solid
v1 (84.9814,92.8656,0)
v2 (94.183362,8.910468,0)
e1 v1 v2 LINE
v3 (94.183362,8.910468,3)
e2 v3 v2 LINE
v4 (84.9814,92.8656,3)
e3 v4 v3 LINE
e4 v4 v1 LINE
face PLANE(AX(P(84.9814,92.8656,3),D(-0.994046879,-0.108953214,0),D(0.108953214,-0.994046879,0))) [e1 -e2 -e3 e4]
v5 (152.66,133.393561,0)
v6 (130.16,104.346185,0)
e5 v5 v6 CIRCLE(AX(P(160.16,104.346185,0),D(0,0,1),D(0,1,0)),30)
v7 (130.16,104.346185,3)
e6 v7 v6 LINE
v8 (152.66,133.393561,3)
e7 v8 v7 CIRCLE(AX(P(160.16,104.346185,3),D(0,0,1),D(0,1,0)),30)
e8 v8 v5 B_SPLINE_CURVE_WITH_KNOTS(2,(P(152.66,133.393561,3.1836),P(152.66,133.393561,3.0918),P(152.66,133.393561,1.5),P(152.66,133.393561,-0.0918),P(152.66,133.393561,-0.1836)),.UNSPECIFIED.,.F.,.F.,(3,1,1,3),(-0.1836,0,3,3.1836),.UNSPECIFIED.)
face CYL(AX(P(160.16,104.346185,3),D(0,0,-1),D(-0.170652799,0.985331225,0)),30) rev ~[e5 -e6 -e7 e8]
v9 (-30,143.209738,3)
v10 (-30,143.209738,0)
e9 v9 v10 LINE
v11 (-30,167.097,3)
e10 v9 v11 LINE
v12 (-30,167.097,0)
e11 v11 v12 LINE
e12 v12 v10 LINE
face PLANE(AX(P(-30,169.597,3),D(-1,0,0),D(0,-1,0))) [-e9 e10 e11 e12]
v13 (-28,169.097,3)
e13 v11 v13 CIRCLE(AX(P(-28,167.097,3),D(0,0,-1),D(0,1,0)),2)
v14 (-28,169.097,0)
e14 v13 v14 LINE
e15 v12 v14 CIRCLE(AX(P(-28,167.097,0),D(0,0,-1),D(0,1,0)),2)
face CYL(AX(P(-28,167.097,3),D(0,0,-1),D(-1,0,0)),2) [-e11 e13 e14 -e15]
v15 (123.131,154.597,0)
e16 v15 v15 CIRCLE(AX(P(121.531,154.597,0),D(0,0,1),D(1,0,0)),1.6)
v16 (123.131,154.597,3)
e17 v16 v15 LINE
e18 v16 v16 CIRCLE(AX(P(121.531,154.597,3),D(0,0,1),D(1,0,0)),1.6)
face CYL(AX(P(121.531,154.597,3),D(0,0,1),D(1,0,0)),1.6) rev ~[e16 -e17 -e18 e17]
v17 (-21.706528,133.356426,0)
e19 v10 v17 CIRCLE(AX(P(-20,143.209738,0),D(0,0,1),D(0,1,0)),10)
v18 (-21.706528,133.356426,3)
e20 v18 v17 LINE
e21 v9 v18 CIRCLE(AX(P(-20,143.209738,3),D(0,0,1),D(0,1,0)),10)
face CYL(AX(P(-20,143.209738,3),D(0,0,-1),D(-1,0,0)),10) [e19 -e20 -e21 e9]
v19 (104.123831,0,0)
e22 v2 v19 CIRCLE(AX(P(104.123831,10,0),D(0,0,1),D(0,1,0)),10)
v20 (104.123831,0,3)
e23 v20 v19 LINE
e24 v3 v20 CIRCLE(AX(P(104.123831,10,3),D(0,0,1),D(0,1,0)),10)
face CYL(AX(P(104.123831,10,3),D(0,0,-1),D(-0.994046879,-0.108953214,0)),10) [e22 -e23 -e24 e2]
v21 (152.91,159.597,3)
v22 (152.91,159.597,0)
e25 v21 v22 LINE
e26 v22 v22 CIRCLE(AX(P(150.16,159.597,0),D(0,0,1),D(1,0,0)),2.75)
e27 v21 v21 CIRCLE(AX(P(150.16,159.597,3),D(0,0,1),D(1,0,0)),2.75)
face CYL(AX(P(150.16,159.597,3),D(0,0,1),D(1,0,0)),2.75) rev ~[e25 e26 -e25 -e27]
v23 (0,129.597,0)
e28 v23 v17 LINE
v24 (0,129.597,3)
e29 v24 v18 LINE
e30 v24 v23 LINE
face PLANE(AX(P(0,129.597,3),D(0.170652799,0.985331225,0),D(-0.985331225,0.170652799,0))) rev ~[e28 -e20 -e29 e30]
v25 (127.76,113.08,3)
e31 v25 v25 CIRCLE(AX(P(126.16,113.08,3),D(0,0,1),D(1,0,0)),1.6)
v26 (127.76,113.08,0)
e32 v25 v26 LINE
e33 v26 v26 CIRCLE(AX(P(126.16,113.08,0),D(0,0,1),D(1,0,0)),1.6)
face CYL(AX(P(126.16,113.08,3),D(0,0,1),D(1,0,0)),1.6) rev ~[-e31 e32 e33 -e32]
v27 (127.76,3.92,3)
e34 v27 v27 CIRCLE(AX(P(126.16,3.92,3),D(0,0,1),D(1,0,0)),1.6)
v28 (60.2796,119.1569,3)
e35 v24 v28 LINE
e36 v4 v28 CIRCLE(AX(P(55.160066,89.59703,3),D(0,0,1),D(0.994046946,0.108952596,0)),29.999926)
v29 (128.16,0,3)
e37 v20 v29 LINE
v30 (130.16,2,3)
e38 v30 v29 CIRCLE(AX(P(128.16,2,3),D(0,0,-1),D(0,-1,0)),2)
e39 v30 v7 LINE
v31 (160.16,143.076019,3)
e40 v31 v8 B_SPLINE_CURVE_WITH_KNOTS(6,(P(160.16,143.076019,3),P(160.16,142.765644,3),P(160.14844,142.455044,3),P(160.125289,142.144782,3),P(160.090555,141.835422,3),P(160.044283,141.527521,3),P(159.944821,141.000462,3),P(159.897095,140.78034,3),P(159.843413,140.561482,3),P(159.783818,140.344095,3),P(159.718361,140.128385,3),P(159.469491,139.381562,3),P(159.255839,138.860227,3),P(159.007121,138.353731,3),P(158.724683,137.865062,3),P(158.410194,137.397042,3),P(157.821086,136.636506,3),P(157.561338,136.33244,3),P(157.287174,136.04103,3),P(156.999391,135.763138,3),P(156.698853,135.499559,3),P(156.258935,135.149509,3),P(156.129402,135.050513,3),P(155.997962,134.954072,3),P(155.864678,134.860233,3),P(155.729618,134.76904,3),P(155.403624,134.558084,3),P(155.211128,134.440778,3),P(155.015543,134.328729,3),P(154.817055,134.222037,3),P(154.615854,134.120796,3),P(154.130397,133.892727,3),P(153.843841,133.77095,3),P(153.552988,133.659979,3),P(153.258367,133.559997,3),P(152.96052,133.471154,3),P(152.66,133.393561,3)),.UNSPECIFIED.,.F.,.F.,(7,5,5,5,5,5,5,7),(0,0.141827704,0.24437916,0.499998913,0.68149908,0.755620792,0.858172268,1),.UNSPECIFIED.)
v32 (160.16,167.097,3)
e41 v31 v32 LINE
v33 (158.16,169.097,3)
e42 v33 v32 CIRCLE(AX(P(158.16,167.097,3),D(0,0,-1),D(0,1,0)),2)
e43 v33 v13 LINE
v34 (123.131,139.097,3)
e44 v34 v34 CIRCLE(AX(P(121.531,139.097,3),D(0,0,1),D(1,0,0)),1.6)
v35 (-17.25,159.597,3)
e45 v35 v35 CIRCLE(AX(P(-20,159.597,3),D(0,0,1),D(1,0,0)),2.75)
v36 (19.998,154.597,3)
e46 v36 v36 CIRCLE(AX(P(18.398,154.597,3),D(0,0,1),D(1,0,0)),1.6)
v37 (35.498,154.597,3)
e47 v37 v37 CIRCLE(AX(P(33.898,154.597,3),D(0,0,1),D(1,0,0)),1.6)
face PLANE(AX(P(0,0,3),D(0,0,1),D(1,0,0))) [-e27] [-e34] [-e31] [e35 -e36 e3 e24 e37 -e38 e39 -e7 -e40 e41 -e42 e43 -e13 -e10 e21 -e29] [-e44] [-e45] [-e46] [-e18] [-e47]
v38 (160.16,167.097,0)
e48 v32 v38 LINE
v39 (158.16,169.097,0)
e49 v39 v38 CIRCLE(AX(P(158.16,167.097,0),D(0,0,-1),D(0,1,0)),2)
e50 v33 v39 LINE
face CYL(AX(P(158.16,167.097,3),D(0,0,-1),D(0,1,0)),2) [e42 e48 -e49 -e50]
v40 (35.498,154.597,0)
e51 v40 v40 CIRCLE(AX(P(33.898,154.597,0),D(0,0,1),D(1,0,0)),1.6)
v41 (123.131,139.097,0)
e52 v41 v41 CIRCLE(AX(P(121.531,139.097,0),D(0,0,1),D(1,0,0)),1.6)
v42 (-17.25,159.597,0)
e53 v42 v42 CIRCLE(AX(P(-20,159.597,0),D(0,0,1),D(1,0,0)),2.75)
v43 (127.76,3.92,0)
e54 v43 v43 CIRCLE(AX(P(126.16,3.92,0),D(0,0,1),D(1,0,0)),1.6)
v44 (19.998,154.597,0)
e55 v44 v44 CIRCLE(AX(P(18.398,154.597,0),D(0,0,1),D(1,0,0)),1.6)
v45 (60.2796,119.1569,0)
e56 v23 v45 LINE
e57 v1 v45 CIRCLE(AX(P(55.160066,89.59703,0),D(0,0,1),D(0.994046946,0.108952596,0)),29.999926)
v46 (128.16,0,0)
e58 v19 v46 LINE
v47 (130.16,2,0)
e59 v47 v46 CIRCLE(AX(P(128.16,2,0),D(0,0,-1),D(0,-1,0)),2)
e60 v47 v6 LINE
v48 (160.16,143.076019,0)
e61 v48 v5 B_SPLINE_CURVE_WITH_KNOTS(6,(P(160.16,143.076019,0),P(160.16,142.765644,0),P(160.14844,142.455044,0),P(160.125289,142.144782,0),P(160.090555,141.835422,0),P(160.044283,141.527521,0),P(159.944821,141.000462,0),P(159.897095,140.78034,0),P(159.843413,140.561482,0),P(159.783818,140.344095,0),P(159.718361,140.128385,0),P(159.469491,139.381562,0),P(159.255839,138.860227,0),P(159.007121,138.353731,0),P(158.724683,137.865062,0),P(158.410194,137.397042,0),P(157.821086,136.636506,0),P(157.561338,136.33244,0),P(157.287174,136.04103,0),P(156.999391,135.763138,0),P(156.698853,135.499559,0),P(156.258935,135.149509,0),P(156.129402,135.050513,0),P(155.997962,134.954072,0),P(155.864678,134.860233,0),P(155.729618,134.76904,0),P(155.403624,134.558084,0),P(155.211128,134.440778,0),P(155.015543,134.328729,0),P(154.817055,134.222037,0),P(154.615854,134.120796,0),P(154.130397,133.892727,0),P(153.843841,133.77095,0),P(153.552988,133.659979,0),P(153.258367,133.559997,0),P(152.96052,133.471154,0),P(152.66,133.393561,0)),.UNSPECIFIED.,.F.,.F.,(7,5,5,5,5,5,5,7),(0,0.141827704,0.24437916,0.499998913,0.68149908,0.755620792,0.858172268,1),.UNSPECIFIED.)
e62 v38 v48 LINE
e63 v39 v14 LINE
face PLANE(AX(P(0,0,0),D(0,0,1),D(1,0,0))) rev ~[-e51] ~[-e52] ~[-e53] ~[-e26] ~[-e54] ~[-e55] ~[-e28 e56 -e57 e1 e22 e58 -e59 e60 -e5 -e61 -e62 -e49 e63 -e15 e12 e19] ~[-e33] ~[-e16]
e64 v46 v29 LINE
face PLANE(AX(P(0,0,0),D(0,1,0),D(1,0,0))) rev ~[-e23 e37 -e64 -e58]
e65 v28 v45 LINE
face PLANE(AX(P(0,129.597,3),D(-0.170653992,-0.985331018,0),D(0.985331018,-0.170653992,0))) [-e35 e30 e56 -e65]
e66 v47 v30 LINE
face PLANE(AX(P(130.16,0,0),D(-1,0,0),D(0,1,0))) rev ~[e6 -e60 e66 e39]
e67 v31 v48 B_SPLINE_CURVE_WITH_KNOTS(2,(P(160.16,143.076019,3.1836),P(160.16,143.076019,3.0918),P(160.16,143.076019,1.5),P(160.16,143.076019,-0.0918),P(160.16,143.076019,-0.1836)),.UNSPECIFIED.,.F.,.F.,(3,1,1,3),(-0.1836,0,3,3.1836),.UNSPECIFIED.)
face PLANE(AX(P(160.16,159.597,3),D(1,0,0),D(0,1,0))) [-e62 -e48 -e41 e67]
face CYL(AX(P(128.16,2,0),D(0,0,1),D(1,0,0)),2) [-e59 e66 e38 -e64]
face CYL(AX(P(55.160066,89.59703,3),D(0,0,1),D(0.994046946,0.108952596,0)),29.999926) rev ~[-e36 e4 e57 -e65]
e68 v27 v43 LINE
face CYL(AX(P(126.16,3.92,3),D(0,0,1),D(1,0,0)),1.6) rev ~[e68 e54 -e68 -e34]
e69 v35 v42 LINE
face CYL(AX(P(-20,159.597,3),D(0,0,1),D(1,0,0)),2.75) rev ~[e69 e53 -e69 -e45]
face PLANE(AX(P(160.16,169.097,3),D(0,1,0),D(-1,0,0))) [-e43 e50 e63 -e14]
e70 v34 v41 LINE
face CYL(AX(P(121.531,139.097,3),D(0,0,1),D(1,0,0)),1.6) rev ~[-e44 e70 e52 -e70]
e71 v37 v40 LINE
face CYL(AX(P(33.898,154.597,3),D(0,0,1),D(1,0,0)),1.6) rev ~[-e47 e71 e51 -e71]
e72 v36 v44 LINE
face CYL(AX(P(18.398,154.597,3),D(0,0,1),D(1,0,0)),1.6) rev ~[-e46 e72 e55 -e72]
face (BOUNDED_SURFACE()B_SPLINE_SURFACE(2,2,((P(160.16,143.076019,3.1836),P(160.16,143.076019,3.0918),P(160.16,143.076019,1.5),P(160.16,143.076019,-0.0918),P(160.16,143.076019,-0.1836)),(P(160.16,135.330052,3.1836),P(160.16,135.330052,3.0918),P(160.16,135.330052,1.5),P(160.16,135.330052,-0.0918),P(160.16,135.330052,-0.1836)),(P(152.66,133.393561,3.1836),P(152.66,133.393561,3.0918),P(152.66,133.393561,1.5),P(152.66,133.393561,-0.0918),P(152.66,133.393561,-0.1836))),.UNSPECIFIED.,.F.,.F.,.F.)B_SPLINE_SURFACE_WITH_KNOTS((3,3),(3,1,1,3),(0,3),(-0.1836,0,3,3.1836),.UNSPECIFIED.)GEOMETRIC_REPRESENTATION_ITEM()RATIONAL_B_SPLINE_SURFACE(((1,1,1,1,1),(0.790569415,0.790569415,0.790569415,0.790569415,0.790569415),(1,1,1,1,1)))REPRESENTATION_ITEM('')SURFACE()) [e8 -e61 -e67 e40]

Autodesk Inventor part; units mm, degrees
ref_plane "YZ Plane" through (0, 0, 0) normal (1, 0, 0) x (0, 1, 0)
ref_plane "XZ Plane" through (0, 0, 0) normal (0, 1, 0) x (-1, 0, 0)
ref_plane "XY Plane" through (0, 0, 0) normal (0, 0, 1) x (1, 0, 0)
sketch "スケッチ1" plane through (0, 0, 0) normal (0, 0, 1) x (1, 0, 0)
  line L0 (0, 0) -> (130.16, 0)
  line L1 (130.16, 0) -> (130.16, 159.597)
  line L2 (130.16, 159.597) -> (0, 159.597)
  line L3 (0, 159.597) -> (0, 0)
  dimension "d0" = 130.16
  dimension "d1" = 159.597
extrude "押し出し1" add sketch "スケッチ1" along normal blind 3
sketch "スケッチ2" plane through (0, 0, 3) normal (0, 0, 1) x (1, 0, 0)
  line L0 (126.16, 3.92) -> (126.16, 113.08) construction
  circle A0 centre (126.16, 3.92) radius 1.6
  circle A1 centre (126.16, 113.08) radius 1.6
  line L1 (130.16, 0) -> (130.16, 159.597) projected
  line L2 (0, 0) -> (130.16, 0) projected
  circle A2 centre (121.531, 154.597) radius 1.6
  line L3 (130.16, 159.597) -> (0, 159.597) projected
  line L4 (121.531, 154.597) -> (121.531, 139.097) construction
  circle A3 centre (121.531, 139.097) radius 1.6
  line L5 (18.398, 154.597) -> (33.898, 154.597) construction
  line L6 (0, 159.597) -> (0, 0) construction
  circle A4 centre (18.398, 154.597) radius 1.6
  circle A5 centre (33.898, 154.597) radius 1.6
  dimension "d4" = 3.2
  dimension "d5" = 4
  dimension "d6" = 3.92
  dimension "d7" = 109.16
  dimension "d10" = 5
  dimension "d11" = 8.629
  dimension "d12" = 15.5
  dimension "d13" = 18.398
  dimension "d14" = 5
  dimension "d15" = 15.5
extrude "押し出し2" cut sketch "スケッチ2" against normal blind 3
sketch "スケッチ4" plane through (0, 0, 3) normal (0, 0, 1) x (1, 0, 0)
  line L0 (130.16, 159.597) -> (0, 159.597) construction
  line L1 (130.16, 0) -> (130.16, 159.597) construction
  line L2 (0, 159.597) -> (0, 0) construction
  line L3 (0, 159.597) -> (-30, 159.597)
  line L4 (-30, 159.597) -> (-30, 129.597)
  line L5 (-30, 129.597) -> (0, 129.597)
  line L6 (0, 129.597) -> (0, 159.597)
  line L7 (130.16, 159.597) -> (160.16, 159.597)
  line L8 (160.16, 159.597) -> (160.16, 129.597)
  line L9 (160.16, 129.597) -> (130.16, 129.597)
  line L10 (130.16, 129.597) -> (130.16, 159.597)
  circle A0 centre (-20, 149.597) radius 2.75
  circle A1 centre (150.16, 149.597) radius 2.75
  dimension "d23" = 30
  dimension "d24" = 30
  dimension "d26" = 10
  dimension "d27" = 10
  dimension "d28" = 10
  dimension "d29" = 10
  dimension "d30" = 5.5
extrude "押し出し4" add sketch "スケッチ4" against normal blind 3
sketch "スケッチ3" plane through (0, 0, 3) normal (0, 0, 1) x (1, 0, 0)
  circle A0 centre (55.16, 89.597) radius 30 construction
  line L0 (0, 159.597) -> (0, 0) construction
  line L1 (0, 129.597) -> (60.2796, 119.1569)
  line L2 (84.9814, 92.8656) -> (95.16, 0)
  line L3 (0, 0) -> (130.16, 0) construction
  line L4 (130.16, 159.597) -> (0, 159.597) construction
  line L5 (130.16, 0) -> (130.16, 159.597) construction
  arc A1 (84.9814, 92.8656) -> (60.2796, 119.1569) centre (55.16, 89.597) ccw
  line L6 (0, 129.597) -> (0, 0)
  line L7 (0, 0) -> (95.16, 0)
  dimension "d16" = 30
  dimension "d17" = 35
  dimension "d18" = 70
  dimension "d19" = 75
  dimension "d20" = 60
extrude "押し出し3" cut sketch "スケッチ3" against normal blind 3
sketch "スケッチ5" plane through (0, 0, 3) normal (0, 0, 1) x (1, 0, 0)
  line L0 (-30, 159.597) -> (160.16, 159.597) construction
  line L1 (65.08, 159.597) -> (65.08, 0) construction
  line L2 (0, 129.597) -> (60.2796, 119.1569) construction
  line L3 (0, 129.597) -> (-30, 134.7928)
  line L4 (-30, 134.7928) -> (-30, 129.597)
  line L5 (-30, 129.597) -> (0, 129.597)
  line L6 (130.16, 129.597) -> (160.16, 134.7928)
  line L7 (160.16, 134.7928) -> (160.16, 129.597)
  line L8 (160.16, 129.597) -> (130.16, 129.597)
  point P0 (0, 0)
extrude "押し出し5" cut sketch "スケッチ5" against normal blind 3
fillet "フィレット1" radius 30 1 edges at (130.16, 129.597, 1.5)
sketch "スケッチ6" plane through (0, 0, 3) normal (0, 0, 1) x (1, 0, 0)
  line L0 (-30, 159.597) -> (160.16, 159.597) construction
  line L1 (-30, 159.597) -> (-30, 134.7928) projected
  line L2 (-30, 159.597) -> (160.16, 159.597)
  line L3 (160.16, 159.597) -> (160.16, 169.597)
  line L4 (160.16, 169.597) -> (-30, 169.597)
  line L5 (-30, 169.597) -> (-30, 159.597)
  line L6 (160.16, 159.597) -> (160.16, 134.7928) projected
  point P0 (0, 0)
  dimension "d38" = 10
extrude "押し出し6" add sketch "スケッチ6" against normal blind 3
sketch "スケッチ7" plane through (0, 0, 3) normal (0, 0, 1) x (1, 0, 0)
  circle A0 centre (-20, 149.597) radius 2.75 construction
  circle A1 centre (150.16, 149.597) radius 2.75 construction
  line L0 (-20, 149.597) -> (-20, 159.597) construction
  circle A2 centre (-20, 159.597) radius 2.75
  line L1 (150.16, 149.597) -> (150.16, 159.597) construction
  circle A3 centre (150.16, 159.597) radius 2.75
  point P0 (0, 0)
  dimension "d41" = 10
extrude "押し出し7" cut sketch "スケッチ7" against normal blind 3
sketch "スケッチ8" plane through (0, 0, 3) normal (0, 0, 1) x (1, 0, 0)
  circle A0 centre (-20, 149.597) radius 2.75 projected
  circle A1 centre (150.16, 149.597) radius 2.75 projected
  point P0 (0, 0)
extrude "押し出し8" add sketch "スケッチ8" against normal blind 3
fillet "フィレット2" radius 10 3 edges at (-30, 134.7928, 1.5) (160.16, 134.7928, 1.5) (95.16, 0, 1.5)
fillet "フィレット2" radius 2 1 edges at (130.16, 0, 1.5)
sketch "スケッチ9" plane through (0, 0, 3) normal (0, 0, 1) x (1, 0, 0)
  line L0 (160.16, 169.597) -> (-30, 169.597) projected
  line L1 (160.16, 143.076) -> (160.16, 169.597) projected
  line L2 (-30, 169.597) -> (160.16, 169.597)
  line L3 (160.16, 169.597) -> (160.16, 169.097)
  line L4 (160.16, 169.097) -> (-30, 169.097)
  line L5 (-30, 169.097) -> (-30, 169.597)
  point P0 (0, 0)
  dimension "d46" = 0.5
extrude "押し出し9" cut sketch "スケッチ9" against normal blind 3
fillet "フィレット3" radius 2 2 edges at (-30, 169.097, 1.5) (160.16, 169.097, 1.5)
equation "\"d28\" = d26"
equation "\"d29\" = d27"
properties part number "small_gpu_04" material "アルミニウム 6061"
